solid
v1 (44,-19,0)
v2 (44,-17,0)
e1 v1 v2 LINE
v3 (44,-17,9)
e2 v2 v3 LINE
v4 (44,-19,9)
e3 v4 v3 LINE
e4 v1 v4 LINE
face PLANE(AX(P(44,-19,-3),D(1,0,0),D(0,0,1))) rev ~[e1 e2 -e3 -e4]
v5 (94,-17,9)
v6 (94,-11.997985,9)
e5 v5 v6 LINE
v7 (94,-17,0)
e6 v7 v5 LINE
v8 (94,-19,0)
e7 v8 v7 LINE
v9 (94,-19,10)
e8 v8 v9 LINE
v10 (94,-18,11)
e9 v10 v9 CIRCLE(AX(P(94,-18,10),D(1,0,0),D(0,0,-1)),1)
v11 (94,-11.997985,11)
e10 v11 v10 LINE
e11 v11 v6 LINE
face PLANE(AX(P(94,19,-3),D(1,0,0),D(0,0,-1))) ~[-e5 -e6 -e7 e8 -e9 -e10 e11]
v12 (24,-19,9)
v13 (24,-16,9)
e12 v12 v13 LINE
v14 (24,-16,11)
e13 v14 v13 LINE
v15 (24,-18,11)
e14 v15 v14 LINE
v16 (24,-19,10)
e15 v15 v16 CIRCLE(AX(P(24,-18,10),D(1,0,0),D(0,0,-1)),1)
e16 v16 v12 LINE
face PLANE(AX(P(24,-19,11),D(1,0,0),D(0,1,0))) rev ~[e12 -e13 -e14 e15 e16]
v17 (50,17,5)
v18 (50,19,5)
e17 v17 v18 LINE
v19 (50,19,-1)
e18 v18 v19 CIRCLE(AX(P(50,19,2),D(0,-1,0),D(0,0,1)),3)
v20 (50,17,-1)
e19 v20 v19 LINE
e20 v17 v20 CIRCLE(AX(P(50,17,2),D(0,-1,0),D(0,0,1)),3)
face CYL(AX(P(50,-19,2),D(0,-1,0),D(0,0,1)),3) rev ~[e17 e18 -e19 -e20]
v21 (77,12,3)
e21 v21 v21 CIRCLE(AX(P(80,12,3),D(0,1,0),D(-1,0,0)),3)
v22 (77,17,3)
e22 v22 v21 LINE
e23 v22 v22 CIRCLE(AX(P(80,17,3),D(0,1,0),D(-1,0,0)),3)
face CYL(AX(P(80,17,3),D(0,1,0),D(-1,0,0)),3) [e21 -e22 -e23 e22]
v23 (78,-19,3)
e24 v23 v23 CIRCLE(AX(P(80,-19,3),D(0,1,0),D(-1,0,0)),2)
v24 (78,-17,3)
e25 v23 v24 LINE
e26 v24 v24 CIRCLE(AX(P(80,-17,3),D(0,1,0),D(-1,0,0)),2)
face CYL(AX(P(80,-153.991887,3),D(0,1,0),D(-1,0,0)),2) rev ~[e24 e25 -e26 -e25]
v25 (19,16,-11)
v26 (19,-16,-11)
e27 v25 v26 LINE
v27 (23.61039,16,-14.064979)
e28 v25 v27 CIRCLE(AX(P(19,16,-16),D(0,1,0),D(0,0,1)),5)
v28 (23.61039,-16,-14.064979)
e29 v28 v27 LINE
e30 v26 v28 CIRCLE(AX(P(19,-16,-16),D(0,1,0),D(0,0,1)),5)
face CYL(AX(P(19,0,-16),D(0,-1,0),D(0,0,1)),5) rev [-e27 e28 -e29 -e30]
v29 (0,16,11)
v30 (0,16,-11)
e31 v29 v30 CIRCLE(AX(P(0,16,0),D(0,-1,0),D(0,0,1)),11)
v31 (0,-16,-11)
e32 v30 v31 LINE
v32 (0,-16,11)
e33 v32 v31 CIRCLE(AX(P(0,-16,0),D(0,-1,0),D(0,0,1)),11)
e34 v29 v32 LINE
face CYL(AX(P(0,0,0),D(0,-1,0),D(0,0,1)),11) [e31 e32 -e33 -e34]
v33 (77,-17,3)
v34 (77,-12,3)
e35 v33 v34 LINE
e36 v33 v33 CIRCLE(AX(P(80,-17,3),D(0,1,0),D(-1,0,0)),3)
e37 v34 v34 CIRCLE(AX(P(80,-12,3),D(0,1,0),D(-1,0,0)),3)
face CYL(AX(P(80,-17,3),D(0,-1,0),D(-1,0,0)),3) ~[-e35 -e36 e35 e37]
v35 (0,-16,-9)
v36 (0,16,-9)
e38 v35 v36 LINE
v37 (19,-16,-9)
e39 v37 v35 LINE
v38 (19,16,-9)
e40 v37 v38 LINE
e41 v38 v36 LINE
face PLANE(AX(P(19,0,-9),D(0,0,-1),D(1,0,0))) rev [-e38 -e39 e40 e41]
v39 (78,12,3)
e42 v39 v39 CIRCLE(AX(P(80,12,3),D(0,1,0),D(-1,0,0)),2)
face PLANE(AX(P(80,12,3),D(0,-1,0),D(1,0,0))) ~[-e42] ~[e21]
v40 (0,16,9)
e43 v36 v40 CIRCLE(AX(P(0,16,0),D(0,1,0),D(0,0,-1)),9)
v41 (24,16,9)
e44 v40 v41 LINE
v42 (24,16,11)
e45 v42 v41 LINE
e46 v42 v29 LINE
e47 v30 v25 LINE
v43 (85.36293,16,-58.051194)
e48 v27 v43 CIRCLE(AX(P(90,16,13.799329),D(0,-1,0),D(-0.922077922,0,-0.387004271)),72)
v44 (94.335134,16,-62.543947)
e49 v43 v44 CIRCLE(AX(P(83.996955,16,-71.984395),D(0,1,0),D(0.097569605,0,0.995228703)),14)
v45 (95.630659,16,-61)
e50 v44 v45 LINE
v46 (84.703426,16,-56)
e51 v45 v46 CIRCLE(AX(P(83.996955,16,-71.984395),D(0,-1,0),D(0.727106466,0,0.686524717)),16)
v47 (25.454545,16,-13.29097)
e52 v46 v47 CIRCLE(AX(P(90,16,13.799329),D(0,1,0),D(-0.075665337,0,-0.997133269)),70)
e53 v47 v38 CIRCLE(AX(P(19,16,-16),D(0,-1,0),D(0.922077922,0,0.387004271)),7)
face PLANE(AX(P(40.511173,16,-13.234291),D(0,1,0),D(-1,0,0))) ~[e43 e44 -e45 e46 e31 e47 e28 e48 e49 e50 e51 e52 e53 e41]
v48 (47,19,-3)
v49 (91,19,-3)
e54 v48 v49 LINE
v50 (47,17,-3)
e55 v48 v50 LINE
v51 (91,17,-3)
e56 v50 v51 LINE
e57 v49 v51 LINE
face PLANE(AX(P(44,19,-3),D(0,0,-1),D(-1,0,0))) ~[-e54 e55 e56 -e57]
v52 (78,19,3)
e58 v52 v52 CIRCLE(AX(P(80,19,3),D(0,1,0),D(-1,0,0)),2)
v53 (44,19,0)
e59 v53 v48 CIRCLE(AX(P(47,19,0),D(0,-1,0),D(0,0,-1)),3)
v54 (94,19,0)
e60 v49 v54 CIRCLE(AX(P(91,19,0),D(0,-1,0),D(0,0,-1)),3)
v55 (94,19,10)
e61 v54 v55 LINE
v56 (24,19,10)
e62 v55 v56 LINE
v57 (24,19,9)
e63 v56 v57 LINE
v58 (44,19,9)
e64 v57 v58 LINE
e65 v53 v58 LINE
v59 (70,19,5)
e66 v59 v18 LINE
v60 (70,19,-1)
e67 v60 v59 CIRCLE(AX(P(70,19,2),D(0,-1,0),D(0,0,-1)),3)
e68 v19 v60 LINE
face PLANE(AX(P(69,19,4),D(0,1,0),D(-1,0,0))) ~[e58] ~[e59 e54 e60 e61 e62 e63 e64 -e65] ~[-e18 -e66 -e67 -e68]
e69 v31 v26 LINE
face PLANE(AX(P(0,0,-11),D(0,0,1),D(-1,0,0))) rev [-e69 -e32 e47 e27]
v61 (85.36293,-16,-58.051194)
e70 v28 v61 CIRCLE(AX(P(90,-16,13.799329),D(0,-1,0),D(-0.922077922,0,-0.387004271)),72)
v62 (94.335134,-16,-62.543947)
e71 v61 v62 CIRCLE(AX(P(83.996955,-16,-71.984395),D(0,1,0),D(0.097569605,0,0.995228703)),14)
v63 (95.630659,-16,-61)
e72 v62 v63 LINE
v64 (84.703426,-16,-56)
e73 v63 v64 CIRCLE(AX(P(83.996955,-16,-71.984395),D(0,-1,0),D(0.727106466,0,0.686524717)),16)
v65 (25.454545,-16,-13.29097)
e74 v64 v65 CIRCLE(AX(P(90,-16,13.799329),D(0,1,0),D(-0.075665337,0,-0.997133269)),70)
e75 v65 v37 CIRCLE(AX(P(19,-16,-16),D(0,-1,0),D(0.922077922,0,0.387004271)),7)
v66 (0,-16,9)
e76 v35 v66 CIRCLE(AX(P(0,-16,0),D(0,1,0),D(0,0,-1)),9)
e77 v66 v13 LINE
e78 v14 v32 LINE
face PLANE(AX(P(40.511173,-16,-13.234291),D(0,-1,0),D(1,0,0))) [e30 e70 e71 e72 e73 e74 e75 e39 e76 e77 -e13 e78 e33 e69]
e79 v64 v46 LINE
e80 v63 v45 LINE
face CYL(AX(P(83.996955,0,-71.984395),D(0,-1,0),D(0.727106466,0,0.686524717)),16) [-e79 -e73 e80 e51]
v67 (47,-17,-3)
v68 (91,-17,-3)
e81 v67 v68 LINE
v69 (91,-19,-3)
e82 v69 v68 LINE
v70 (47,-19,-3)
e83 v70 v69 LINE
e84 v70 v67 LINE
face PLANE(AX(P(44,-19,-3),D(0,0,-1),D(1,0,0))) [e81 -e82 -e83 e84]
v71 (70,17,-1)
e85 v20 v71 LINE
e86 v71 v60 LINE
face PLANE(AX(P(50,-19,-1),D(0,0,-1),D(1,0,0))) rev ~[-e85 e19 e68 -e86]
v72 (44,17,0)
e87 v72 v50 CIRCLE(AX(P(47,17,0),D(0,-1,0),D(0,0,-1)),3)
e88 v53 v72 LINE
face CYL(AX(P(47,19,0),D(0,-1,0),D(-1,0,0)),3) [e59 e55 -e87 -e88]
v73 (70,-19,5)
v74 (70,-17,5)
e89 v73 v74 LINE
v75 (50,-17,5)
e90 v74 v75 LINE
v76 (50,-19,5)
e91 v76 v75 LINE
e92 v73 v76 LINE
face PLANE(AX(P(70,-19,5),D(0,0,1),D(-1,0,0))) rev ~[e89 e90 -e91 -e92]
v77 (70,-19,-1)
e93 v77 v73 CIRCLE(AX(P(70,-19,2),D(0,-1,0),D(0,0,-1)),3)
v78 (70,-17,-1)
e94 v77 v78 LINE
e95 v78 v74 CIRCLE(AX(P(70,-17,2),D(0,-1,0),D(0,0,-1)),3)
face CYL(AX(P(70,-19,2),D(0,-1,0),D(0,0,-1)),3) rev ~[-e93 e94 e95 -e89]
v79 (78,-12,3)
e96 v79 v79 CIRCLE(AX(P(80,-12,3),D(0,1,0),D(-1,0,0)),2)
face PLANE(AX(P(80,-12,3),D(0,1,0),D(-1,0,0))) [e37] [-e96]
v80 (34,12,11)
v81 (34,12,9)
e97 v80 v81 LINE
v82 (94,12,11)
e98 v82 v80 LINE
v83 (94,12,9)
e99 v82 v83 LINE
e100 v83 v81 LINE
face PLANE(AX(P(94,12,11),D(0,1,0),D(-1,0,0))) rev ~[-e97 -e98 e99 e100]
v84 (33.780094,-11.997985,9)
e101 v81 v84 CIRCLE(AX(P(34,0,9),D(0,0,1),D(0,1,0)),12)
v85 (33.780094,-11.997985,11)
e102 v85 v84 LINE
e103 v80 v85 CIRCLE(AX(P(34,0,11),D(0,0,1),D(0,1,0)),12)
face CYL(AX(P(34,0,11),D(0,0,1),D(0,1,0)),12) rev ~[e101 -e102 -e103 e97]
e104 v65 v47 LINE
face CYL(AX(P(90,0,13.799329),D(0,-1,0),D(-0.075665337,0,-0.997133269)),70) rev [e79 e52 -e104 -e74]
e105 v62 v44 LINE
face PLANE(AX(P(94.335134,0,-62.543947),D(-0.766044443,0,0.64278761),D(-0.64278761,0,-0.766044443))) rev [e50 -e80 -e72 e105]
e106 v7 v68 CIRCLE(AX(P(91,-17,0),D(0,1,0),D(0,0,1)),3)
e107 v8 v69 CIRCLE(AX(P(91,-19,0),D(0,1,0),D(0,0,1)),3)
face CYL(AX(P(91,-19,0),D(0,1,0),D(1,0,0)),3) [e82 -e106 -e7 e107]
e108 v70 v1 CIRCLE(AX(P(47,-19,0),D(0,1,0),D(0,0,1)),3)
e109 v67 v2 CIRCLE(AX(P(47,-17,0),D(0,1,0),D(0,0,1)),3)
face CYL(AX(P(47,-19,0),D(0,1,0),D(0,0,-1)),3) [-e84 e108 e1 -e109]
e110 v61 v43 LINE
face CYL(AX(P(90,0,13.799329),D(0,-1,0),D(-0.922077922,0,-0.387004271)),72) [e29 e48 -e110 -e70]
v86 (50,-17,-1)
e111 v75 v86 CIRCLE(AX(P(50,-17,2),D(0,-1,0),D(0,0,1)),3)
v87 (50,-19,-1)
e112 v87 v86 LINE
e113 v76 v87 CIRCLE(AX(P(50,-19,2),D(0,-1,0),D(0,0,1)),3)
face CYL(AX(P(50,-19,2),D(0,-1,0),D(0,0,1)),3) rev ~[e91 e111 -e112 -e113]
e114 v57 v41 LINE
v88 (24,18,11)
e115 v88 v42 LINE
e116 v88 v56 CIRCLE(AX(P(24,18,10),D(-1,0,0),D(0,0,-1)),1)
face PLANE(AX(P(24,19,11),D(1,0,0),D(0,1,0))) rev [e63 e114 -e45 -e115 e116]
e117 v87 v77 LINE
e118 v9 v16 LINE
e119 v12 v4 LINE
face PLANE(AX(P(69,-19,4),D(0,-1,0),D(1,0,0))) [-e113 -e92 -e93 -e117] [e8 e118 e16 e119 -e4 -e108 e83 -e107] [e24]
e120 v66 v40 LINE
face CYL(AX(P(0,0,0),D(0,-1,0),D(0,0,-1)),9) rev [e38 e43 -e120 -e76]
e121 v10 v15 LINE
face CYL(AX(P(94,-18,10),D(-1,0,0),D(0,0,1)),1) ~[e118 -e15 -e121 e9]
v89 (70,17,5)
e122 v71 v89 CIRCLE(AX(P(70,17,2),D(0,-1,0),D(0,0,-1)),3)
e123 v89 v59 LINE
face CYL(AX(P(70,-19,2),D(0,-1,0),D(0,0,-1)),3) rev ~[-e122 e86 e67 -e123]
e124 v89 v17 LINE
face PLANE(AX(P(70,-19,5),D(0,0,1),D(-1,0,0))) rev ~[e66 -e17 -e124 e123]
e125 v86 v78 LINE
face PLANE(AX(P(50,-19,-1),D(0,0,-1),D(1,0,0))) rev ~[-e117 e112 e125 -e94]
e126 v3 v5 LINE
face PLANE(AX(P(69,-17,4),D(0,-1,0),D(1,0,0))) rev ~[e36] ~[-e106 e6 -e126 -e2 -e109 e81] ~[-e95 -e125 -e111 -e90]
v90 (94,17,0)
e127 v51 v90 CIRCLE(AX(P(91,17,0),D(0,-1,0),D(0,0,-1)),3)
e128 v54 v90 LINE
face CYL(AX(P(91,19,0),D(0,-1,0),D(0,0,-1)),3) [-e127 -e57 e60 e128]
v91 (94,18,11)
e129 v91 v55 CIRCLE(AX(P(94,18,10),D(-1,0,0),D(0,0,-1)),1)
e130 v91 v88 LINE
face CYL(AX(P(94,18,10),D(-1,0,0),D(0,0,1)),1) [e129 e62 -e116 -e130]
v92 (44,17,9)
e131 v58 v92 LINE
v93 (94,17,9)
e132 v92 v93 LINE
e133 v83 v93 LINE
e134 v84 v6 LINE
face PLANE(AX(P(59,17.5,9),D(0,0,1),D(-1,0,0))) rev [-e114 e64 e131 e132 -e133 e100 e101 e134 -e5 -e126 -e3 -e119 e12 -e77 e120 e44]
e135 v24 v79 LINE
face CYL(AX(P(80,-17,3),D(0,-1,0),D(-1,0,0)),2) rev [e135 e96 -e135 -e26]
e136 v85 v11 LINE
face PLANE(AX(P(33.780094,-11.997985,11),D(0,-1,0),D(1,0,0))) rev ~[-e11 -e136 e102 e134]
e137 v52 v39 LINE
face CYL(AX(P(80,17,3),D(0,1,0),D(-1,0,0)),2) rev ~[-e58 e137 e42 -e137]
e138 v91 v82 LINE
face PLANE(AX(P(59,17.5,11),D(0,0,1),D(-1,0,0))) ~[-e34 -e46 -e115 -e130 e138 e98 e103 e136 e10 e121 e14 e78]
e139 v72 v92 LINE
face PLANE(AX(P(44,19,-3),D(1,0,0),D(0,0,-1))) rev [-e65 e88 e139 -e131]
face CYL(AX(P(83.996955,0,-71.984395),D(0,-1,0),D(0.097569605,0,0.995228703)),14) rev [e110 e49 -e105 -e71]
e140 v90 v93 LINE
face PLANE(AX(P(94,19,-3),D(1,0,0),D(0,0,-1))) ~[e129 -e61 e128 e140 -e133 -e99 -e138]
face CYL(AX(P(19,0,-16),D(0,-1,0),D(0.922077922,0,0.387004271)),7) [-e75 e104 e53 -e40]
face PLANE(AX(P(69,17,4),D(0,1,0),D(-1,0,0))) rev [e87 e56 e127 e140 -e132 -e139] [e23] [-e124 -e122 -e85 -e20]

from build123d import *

# Parameters (mm, degrees)
F1_DEPTH  = 16
F2_W      = 70
F2_H      = 3
F3_DEPTH  = 2
F4_W      = 50
F4_H      = 14
F5_DEPTH  = 2
F6_R      = 1
F9_DEPTH  = 2
F11_DEPTH = 38.001
F13_D     = 4
F14_R     = 3
F14_R_2   = 2
F15_DEPTH = 5
F16_R     = 3


# Not quite as in the source:
# - a pattern or mirror of a feature is missing from the dataset's text; its kind, count and spacing are read off the source's solid


with BuildPart() as f1:
    # F0 (on Front) → F1 (new body)
    with BuildSketch(Plane.XZ):
        with BuildLine():
            Line((94, 11), (0, 11))
            ThreePointArc((0, 11), (-11, 0), (0, -11))
            Line((0, -11), (19, -11))
            ThreePointArc((19, -11), (21.7681124643, -11.8361612201), (23.6103896104, -14.064978646))
            ThreePointArc((23.6103896104, -14.064978646), (48.2280702466, -44.8445615778), (85.3629298173, -58.0511936248))
            ThreePointArc((85.3629298173, -58.0511936248), (90.2653686658, -59.4661290396), (94.3351335924, -62.5439468273))
            Line((94.3351335924, -62.5439468273), (95.6306588057, -61))
            ThreePointArc((95.6306588057, -61), (90.6542803924, -57.4351678896), (84.7034264019, -56))
            ThreePointArc((84.7034264019, -56), (49.0672193413, -42.9854179344), (25.4545454545, -13.2909701044))
            ThreePointArc((25.4545454545, -13.2909701044), (22.87535745, -10.1706257081), (19, -9))
            Line((19, -9), (0, -9))
            ThreePointArc((0, -9), (-9, 0), (0, 9))
            Line((0, 9), (94, 9))
            Line((94, 9), (94, 11))
        make_face()
    extrude(amount=F1_DEPTH)

    # F2 (on face) → F3 (join)
    with BuildSketch(Plane.XY.offset(11)):
        with Locations((59, -17.5)):
            Rectangle(F2_W, F2_H)
    extrude(amount=-F3_DEPTH)

    # F4 (on face) → F5 (join)
    with BuildSketch(Plane.XZ.offset(19)):
        with Locations((69, 4)):
            Rectangle(F4_W, F4_H)
    extrude(amount=-F5_DEPTH)

    # F6
    f6_edges = [f1.edges().sort_by_distance(p)[0] for p in [
        (59, -19, 11),
    ]]
    fillet(f6_edges, radius=F6_R)

    # F7: F1 across plane


with BuildPart() as f1_1:
    add(f1.part)
    add(f1.part.mirror(Plane.XZ))

    # F8 (on face) → F9 (cut)
    with BuildSketch(Plane.XY.offset(11)):
        with BuildLine():
            Line((94, 12), (34, 12))
            ThreePointArc((34, 12), (22.0005037904, 0.1099577956), (33.7800936413, -11.9979848805))
            Line((33.7800936413, -11.9979848805), (34.2199063587, -11.9979848805))
            Line((34.2199063587, -11.9979848805), (94, -11.9979848805))
            Line((94, -11.9979848805), (94, 12))
        make_face()
    extrude(amount=-F9_DEPTH, mode=Mode.SUBTRACT)

    # F10 (on face) → F11 (cut, through all)
    with BuildSketch(Plane.XZ.offset(19)):
        with BuildLine():
            ThreePointArc((50, 5), (47, 2), (50, -1))
            Line((50, -1), (70, -1))
            ThreePointArc((70, -1), (73, 2), (70, 5))
            Line((70, 5), (50, 5))
        make_face()
    extrude(amount=-F11_DEPTH, mode=Mode.SUBTRACT)

    # F13 (through all)
    with Locations(Plane.XZ.offset(19)):
        with Locations((80, 3)):
            Hole(F13_D / 2)

    # F14 (on face) → F15 (join)
    with BuildSketch(Plane(origin=(0, -17, 0), x_dir=(-1, 0, 0), z_dir=(0, 1, 0))):
        with Locations((-80, 3)):
            Circle(F14_R)
        with Locations((-80, 3)):
            Circle(F14_R_2, mode=Mode.SUBTRACT)
    f15 = extrude(amount=F15_DEPTH)

    # F15_copies: F15 across plane
    add(f15.mirror(Plane.ZX))

    # F16
    f16_edges = [f1_1.edges().sort_by_distance(p)[0] for p in [
        (94, -18, -3),
        (44, -18, -3),
        (44, 18, -3),
        (94, 18, -3),
    ]]
    fillet(f16_edges, radius=F16_R)


solid = f1_1.part
